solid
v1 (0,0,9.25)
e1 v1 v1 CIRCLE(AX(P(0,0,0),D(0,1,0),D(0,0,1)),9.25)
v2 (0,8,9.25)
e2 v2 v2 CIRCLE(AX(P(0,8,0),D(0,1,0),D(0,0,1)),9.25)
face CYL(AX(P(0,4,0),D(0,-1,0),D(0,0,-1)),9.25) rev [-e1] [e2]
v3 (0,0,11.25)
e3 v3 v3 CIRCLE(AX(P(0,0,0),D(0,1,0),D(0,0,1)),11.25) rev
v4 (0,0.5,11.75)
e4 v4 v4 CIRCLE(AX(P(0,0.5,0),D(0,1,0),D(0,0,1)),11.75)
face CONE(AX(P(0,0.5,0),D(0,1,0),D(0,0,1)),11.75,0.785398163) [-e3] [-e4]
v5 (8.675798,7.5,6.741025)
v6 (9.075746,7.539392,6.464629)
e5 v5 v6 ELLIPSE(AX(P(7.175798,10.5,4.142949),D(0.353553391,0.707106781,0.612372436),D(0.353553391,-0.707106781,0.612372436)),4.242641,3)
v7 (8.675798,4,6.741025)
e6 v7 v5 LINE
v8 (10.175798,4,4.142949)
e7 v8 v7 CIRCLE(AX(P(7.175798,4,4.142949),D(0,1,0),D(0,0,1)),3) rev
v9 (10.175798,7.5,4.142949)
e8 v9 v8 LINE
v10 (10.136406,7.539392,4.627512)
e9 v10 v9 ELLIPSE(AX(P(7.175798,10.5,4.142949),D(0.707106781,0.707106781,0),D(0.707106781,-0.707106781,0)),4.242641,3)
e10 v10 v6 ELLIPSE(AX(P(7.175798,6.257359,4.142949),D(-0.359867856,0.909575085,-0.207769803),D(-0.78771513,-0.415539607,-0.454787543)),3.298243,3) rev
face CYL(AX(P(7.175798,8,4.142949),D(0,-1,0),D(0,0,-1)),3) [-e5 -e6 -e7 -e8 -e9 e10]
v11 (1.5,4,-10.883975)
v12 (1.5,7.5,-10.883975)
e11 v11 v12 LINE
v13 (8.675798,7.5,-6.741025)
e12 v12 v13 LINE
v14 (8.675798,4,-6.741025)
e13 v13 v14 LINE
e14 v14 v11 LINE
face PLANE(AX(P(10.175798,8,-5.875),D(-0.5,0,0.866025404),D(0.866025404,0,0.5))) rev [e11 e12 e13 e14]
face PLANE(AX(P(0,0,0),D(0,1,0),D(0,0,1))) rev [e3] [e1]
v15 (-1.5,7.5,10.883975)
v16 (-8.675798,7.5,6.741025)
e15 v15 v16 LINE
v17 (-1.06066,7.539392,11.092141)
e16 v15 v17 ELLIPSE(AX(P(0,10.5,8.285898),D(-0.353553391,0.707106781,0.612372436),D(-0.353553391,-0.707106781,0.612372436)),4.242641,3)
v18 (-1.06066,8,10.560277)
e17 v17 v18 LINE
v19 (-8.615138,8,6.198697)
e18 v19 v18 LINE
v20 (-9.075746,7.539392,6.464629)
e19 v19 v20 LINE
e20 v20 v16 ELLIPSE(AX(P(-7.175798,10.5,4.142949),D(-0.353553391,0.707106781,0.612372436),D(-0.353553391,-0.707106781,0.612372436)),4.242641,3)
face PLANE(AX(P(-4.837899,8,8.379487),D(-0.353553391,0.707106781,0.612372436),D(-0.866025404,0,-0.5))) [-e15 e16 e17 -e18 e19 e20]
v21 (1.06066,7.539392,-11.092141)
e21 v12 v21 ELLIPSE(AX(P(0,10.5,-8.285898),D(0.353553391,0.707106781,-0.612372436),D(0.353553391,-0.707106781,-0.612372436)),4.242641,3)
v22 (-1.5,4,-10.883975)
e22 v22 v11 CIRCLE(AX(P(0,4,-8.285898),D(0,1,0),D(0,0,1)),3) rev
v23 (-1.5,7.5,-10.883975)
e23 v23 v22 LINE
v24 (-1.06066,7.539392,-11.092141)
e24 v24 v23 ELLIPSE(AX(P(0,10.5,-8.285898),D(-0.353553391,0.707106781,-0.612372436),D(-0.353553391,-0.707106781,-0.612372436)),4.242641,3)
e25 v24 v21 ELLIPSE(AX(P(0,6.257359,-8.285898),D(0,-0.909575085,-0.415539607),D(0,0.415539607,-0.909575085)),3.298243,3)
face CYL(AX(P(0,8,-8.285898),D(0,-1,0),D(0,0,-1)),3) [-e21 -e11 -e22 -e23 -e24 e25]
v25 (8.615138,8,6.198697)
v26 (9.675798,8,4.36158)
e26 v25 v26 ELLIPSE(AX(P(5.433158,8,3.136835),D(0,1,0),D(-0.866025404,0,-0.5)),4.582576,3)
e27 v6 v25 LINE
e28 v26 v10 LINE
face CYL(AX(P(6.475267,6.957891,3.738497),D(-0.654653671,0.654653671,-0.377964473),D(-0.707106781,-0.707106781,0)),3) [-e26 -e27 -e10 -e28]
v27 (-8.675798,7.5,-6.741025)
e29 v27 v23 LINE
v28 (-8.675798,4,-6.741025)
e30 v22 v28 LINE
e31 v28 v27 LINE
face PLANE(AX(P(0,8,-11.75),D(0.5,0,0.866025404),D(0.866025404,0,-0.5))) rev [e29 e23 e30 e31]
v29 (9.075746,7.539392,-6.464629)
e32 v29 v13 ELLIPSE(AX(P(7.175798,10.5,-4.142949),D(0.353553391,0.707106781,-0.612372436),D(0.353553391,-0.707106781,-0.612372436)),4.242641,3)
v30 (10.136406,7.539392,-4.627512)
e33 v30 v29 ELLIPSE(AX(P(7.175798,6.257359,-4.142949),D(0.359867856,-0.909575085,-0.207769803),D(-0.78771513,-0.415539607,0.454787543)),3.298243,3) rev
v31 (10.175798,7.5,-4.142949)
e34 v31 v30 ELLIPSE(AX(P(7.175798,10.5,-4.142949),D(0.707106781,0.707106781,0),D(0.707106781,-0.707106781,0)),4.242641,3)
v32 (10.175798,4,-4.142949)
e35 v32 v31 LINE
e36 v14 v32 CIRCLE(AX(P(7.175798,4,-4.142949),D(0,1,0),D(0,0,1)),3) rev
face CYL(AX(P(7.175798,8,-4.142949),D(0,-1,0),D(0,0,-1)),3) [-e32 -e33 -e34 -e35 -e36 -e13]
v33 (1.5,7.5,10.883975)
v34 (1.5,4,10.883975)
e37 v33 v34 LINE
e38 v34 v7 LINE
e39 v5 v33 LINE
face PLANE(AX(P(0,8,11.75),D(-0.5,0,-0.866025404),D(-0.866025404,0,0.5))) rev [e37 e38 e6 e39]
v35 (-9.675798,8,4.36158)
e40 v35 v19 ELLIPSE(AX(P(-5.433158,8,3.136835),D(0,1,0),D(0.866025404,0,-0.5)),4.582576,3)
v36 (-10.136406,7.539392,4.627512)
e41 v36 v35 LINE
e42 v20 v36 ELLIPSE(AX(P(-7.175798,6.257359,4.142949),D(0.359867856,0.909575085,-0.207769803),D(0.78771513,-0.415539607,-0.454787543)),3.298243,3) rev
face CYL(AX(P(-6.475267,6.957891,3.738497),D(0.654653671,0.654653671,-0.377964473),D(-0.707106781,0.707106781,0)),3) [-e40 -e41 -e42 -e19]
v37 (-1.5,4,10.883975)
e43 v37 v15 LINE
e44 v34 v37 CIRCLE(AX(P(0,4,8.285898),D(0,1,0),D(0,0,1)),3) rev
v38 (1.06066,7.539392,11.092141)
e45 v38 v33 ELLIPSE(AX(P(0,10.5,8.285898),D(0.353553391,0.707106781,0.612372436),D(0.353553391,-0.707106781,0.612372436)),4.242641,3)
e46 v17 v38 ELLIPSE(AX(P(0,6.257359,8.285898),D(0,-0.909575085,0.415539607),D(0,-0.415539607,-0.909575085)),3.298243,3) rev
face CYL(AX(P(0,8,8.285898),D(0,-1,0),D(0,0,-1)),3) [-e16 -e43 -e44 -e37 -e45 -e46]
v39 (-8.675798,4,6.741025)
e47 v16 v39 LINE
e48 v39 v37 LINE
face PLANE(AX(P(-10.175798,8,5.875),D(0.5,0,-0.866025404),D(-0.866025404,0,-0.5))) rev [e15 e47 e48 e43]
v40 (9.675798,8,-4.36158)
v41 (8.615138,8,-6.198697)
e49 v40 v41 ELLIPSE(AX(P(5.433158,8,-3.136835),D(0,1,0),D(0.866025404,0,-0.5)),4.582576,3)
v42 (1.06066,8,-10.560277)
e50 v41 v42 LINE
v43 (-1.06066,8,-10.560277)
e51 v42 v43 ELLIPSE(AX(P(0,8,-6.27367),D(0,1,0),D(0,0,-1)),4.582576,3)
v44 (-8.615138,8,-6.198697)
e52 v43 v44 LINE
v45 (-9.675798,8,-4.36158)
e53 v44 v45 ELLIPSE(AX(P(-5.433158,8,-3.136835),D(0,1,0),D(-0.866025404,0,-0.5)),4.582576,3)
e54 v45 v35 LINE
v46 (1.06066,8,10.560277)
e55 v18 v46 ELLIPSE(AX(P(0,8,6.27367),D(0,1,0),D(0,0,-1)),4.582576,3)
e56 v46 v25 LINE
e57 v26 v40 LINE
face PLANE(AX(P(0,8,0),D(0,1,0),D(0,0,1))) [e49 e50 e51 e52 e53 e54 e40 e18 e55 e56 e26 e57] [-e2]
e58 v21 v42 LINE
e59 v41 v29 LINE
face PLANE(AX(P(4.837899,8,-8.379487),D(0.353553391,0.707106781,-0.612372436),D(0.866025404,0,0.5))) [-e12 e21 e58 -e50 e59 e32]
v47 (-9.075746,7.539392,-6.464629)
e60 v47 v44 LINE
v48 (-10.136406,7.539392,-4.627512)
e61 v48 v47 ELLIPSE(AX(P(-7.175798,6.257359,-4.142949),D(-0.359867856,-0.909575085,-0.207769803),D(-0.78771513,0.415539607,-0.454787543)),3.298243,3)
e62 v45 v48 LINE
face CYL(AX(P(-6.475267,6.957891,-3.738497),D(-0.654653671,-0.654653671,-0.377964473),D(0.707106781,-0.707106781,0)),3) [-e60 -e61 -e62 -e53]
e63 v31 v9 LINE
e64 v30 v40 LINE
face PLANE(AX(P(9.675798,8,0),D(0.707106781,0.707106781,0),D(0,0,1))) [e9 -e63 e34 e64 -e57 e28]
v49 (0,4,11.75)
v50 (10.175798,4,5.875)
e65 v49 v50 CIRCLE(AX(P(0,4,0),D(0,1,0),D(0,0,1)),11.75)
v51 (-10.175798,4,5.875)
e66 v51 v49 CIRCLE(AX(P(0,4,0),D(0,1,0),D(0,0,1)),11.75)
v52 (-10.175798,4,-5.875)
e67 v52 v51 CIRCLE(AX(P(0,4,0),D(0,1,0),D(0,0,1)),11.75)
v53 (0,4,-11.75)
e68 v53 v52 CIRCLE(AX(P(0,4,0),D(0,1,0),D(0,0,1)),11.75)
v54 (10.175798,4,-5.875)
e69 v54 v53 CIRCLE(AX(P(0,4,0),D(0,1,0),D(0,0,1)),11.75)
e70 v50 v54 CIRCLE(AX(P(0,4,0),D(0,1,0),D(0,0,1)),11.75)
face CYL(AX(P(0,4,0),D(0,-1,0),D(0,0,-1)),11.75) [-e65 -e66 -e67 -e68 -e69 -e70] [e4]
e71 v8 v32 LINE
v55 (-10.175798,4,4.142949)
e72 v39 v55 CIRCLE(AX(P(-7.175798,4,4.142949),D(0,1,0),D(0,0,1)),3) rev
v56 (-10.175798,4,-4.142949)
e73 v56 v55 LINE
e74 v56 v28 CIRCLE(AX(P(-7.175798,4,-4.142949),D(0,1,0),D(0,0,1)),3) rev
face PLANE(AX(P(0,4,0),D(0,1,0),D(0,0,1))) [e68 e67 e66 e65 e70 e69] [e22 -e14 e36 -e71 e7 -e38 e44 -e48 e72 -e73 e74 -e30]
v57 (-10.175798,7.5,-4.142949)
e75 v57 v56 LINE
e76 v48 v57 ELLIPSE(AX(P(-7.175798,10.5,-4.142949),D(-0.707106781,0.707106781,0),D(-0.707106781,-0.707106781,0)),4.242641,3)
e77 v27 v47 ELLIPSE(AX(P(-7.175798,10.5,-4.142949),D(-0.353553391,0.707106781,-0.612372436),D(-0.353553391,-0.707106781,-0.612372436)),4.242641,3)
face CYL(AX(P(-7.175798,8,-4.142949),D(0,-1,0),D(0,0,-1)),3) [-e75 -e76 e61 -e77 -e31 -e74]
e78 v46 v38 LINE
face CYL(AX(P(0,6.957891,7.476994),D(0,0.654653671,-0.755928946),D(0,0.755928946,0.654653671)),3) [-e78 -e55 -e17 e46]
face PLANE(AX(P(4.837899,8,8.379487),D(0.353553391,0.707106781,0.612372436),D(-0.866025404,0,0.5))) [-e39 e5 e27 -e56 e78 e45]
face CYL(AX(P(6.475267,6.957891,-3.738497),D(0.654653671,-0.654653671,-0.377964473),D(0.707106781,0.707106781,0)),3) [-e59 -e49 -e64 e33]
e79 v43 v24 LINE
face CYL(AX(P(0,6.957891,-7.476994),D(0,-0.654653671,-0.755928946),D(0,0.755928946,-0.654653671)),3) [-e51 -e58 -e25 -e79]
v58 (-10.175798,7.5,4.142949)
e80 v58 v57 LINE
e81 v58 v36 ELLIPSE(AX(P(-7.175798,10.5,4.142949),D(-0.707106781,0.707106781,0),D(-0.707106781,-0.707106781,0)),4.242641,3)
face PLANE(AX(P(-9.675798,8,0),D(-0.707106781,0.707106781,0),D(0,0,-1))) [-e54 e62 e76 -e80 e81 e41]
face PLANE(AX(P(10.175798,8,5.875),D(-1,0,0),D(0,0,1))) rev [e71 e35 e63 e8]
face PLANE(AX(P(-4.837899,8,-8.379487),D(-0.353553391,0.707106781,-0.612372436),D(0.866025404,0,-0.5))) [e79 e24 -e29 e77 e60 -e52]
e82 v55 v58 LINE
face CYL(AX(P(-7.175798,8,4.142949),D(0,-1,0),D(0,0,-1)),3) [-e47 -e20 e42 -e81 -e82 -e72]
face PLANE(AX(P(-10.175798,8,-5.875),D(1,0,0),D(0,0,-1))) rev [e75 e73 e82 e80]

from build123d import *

# Parameters (mm, degrees)
SKETCH_1_R      = 11.75
SKETCH_1_R_2    = 9.25
EXTRUDE_1_DEPTH = 4
SKETCH_2_R      = 9.25
EXTRUDE_2_DEPTH = 4
CHAMFER_1_SIZE  = 0.5
FILLET_1_R      = 3


with BuildPart() as part:
    # 草图1 → 凸台-拉伸1 (new body)
    with BuildSketch(Plane(origin=(0, 0, 0), x_dir=(1, 0, 0), z_dir=(0, 1, 0))):
        with Locations(Location((0, 0, 0), (0, 0, 270))):
            Circle(SKETCH_1_R)
        with Locations(Location((0, 0, 0), (0, 0, 270))):
            Circle(SKETCH_1_R_2, mode=Mode.SUBTRACT)
    extrude(amount=EXTRUDE_1_DEPTH)

    # 草图2 → 凸台-拉伸2 (add)
    with BuildSketch(Plane(origin=(0, 4, 0), x_dir=(1, 0, 0), z_dir=(0, 1, 0))):
        Polygon((0, 11.75), (-10.175798494, 5.875), (-10.175798494, -5.875), (0, -11.75), (10.175798494, -5.875), (10.175798494, 5.875), align=None)
        with Locations(Location((0, 0, 0), (0, 0, 270))):
            Circle(SKETCH_2_R, mode=Mode.SUBTRACT)
    extrude(amount=EXTRUDE_2_DEPTH)

    # 倒角1
    chamfer_1_edges = [part.edges().sort_by_distance(p)[0] for p in [
        (5.087899247, 8, -8.8125),
        (-5.087899247, 8, -8.8125),
        (-10.175798494, 8, 0),
        (-5.087899247, 8, 8.8125),
        (5.087899247, 8, 8.8125),
        (10.175798494, 8, 0),
        (0, 0, -11.75),
    ]]
    chamfer(chamfer_1_edges, length=CHAMFER_1_SIZE)

    # 圆角1
    # the kernel refuses this fillet: 3 mm, written as the material it takes off along each edge
    with BuildSketch(Plane(origin=(-10.175798494, 4, 5.875), x_dir=(0.8660254037844421, 0, 0.49999999999999395), z_dir=(0, 1, 0)), Plane(origin=(-10.175798494, 4, -5.875), x_dir=(0, 0, 1), z_dir=(0, 1, 0)), Plane(origin=(0, 4, -11.75), x_dir=(-0.866025403784437, 0, 0.5000000000000027), z_dir=(0, 1, 0))) as fillet_1_piece_1:
        with BuildLine():
            CenterArc((FILLET_1_R * 0.57735026919, FILLET_1_R), FILLET_1_R, 210, 60)
            Line((-FILLET_1_R * 0.288675134595, FILLET_1_R * 0.5), (0, 0))
            Line((0, 0), (FILLET_1_R * 0.57735026919, 0))
        make_face()
    extrude(amount=7.830127019, mode=Mode.SUBTRACT)
    with BuildSketch(Plane(origin=(10.175798494, 4, -5.875), x_dir=(0, 0, 1), z_dir=(0, 1, 0)), Plane(origin=(10.175798494, 4, 5.875), x_dir=(-0.8660254037844379, 0, 0.5000000000000011), z_dir=(0, 1, 0)), Plane(origin=(0, 4, 11.75), x_dir=(-0.8660254037844418, 0, -0.4999999999999945), z_dir=(0, 1, 0))) as fillet_1_piece_2:
        with BuildLine():
            CenterArc((FILLET_1_R * 0.57735026919, -FILLET_1_R), FILLET_1_R, 90, 60)
            Line((-FILLET_1_R * 0.288675134595, -FILLET_1_R * 0.5), (0, 0))
            Line((0, 0), (FILLET_1_R * 0.57735026919, 0))
        make_face()
    extrude(amount=7.830127019, mode=Mode.SUBTRACT)
    with BuildSketch(Plane(origin=(7.820029772, 9.855768722, -4.514896294), x_dir=(0.2672612419124255, -0.2672612419124255, 0.9258200997725509), z_dir=(0.6546536707079768, -0.6546536707079768, -0.3779644730092288)), Plane(origin=(0, 9.855768722, 9.029792588), x_dir=(-0.935414346693487, -0.26726124191242306, -0.2314550249431329), z_dir=(3.5248488275713354e-15, -0.6546536707079781, 0.7559289460184537))) as fillet_1_piece_3:
        with BuildLine():
            CenterArc((FILLET_1_R * 0.377964473009, FILLET_1_R), FILLET_1_R, 228.590377891, 41.409622109)
            Line((-FILLET_1_R * 0.283473354757, FILLET_1_R * 0.25), (0, 0))
            Line((0, 0), (FILLET_1_R * 0.377964473009, 0))
        make_face()
    extrude(amount=6.433229711, mode=Mode.SUBTRACT)
    with BuildSketch(Plane(origin=(12.031567217, 5.644231278, 6.946428571), x_dir=(-0.66815310478106, -0.2672612419124238, 0.6943650748294146), z_dir=(-0.6546536707079774, 0.6546536707079774, -0.37796447300922653)), Plane(origin=(0, 9.855768722, -9.029792588), x_dir=(-0.935414346693485, -0.26726124191242234, 0.2314550249431414), z_dir=(-3.944473687996493e-15, -0.6546536707079779, -0.755928946018454)), Plane(origin=(-7.820029772, 9.855768722, -4.514896294), x_dir=(-0.26726124191242423, -0.26726124191242345, 0.9258200997725519), z_dir=(-0.6546536707079775, -0.6546536707079774, -0.37796447300922653)), Plane(origin=(-7.820029772, 9.855768722, 4.514896294), x_dir=(0.6681531047810633, -0.26726124191242634, 0.6943650748294108), z_dir=(-0.6546536707079768, -0.6546536707079768, 0.37796447300922886))) as fillet_1_piece_4:
        with BuildLine():
            CenterArc((FILLET_1_R * 0.377964473009, -FILLET_1_R), FILLET_1_R, 90, 41.409622109)
            Line((-FILLET_1_R * 0.283473354757, -FILLET_1_R * 0.25), (0, 0))
            Line((0, 0), (FILLET_1_R * 0.377964473009, 0))
        make_face()
    extrude(amount=6.433229711, mode=Mode.SUBTRACT)


solid = part.part
